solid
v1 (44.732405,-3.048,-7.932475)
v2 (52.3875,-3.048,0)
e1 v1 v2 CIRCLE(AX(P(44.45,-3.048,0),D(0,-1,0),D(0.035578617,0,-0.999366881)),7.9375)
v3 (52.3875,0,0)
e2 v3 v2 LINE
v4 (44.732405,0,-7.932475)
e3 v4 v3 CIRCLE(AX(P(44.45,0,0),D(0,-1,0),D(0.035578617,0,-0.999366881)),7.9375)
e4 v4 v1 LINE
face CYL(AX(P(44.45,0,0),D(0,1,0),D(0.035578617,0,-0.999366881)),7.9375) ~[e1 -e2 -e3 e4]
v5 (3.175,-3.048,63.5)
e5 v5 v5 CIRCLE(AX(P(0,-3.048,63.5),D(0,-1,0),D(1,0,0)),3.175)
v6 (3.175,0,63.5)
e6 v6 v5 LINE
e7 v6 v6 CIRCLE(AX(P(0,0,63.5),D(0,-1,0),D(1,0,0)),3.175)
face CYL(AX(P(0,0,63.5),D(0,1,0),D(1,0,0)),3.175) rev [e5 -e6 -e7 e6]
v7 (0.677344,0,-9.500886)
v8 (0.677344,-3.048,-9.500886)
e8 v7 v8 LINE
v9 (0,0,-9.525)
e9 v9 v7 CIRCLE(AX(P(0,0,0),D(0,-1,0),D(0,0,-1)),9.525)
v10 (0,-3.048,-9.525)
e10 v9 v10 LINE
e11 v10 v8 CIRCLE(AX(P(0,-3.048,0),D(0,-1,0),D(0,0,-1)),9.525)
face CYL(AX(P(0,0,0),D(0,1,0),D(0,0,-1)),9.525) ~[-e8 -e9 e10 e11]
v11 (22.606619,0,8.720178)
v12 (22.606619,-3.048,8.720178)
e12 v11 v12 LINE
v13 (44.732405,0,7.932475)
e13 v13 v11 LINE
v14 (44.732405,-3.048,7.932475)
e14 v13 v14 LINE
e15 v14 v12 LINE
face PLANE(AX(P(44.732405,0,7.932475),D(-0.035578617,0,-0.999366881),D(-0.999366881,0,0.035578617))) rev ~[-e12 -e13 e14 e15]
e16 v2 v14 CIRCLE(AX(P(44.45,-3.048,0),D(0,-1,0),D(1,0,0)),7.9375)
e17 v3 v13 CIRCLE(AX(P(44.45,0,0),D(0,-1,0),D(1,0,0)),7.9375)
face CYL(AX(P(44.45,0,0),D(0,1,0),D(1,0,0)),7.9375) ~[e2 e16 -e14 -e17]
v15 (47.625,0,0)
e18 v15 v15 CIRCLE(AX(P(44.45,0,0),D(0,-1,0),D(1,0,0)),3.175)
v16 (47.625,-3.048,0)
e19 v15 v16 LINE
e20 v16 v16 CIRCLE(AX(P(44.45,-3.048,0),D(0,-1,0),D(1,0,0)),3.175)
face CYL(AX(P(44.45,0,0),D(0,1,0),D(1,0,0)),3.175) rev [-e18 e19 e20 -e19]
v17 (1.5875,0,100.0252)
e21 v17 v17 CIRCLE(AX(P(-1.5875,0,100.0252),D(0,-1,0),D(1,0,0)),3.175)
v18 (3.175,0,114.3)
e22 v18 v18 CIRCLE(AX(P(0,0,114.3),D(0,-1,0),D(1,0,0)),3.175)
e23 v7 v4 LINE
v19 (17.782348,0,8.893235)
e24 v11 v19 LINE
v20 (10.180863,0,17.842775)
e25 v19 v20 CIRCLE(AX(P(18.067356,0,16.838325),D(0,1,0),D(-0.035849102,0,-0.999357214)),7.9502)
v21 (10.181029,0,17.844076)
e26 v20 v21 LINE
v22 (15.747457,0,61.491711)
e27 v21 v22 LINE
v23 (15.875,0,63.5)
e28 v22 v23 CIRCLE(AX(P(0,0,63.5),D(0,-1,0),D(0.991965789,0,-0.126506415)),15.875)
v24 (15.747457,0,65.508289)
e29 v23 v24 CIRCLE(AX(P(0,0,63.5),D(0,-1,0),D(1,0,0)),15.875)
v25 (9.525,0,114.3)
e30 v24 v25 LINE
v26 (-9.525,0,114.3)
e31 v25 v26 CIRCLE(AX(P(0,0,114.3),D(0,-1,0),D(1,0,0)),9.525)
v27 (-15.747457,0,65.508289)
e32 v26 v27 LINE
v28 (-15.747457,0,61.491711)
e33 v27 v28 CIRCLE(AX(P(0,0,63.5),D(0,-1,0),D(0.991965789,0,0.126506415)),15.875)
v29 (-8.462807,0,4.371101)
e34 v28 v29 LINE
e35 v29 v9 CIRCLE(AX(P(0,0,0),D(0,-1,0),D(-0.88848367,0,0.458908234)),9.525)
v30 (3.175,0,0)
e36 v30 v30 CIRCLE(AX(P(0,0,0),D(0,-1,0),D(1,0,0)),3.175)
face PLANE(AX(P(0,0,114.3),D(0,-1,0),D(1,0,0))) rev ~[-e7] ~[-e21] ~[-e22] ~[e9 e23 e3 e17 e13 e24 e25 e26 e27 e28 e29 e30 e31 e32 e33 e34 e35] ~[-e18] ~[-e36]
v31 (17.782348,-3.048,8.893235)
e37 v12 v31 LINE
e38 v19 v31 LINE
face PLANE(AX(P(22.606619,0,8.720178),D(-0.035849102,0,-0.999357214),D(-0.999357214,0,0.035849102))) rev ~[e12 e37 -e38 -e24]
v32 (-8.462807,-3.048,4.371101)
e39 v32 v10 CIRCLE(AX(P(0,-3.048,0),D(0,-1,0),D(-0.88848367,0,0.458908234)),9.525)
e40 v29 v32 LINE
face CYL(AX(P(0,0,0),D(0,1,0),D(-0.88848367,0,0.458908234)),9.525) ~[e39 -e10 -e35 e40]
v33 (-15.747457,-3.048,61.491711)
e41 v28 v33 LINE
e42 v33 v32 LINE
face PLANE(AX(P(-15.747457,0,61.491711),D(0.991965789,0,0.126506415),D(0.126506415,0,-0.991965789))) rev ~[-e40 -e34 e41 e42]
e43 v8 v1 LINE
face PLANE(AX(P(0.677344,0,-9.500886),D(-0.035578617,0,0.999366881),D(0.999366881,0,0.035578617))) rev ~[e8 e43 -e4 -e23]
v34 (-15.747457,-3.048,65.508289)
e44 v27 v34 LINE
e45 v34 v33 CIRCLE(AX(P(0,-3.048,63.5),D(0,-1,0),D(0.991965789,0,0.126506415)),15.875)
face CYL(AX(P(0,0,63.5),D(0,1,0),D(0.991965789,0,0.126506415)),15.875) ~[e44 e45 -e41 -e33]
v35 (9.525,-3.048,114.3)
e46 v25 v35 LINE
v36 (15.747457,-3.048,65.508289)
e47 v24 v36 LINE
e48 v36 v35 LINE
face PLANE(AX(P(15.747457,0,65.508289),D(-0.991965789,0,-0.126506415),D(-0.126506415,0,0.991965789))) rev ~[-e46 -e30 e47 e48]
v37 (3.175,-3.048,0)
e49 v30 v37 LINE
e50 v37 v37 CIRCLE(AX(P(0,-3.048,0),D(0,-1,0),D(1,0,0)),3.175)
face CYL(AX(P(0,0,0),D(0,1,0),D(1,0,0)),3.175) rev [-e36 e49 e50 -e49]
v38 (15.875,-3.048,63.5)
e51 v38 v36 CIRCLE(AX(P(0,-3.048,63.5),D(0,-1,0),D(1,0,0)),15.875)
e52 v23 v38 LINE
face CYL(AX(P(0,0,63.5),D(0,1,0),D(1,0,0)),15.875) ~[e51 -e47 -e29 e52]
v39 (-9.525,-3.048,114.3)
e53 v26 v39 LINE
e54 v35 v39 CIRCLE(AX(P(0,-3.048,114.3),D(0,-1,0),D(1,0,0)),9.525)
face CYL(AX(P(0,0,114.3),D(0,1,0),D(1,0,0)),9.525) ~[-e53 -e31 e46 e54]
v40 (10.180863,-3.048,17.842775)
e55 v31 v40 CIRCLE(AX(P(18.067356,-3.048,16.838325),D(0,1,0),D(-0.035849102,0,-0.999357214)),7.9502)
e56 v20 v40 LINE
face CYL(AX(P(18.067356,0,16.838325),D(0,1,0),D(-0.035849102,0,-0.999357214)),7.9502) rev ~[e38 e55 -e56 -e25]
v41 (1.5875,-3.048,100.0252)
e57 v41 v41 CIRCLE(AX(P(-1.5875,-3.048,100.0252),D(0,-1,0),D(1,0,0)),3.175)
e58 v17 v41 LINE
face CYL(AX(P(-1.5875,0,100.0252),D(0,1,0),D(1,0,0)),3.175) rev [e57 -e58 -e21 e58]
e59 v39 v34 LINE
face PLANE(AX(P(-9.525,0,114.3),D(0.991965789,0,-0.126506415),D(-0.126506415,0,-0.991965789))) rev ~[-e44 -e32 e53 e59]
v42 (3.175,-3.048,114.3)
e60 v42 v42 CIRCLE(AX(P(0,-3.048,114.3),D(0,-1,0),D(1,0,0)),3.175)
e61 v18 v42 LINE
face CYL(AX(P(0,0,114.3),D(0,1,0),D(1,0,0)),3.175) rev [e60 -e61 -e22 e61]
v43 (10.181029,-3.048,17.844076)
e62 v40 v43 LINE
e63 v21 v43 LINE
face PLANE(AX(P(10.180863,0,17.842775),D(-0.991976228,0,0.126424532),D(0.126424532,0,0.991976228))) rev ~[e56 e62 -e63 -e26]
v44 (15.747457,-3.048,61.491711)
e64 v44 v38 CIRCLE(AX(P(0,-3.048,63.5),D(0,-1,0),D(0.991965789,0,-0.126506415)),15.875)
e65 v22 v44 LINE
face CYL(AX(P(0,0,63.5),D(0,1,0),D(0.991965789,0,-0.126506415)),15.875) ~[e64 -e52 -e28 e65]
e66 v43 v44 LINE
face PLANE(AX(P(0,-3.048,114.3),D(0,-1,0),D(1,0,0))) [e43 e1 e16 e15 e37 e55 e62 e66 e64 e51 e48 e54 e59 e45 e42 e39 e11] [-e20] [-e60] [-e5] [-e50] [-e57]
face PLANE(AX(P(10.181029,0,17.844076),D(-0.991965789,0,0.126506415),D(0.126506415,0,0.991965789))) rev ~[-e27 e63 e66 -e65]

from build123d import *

# Parameters (mm, degrees)
F0_R     = 3.175
F1_DEPTH = 3.048


# Not quite as in the source:
# - ends of sketch curves that miss each other by under 0.0002 mm in the source are joined


with BuildPart() as f1:
    # F0 (on Front) → F1 (new body)
    with BuildSketch(Plane.XZ):
        with BuildLine():
            ThreePointArc((-9.525, 114.3), (0, 104.775), (9.525, 114.3))
            ThreePointArc((9.525, 114.3), (0, 123.825), (-9.525, 114.3))
        make_face()
        with Locations((0, 114.3)):
            Circle(F0_R, mode=Mode.SUBTRACT)
        with BuildLine():
            Line((15.7474569047, 65.5082893304), (9.525, 114.3))
            ThreePointArc((9.525, 114.3), (0, 104.775), (-9.525, 114.3))
            Line((-9.525, 114.3), (-15.7474569047, 65.5082893304))
            ThreePointArc((-15.7474569047, 65.5082893304), (0, 79.375), (15.7474569047, 65.5082893304))
        make_face()
        with Locations((-1.5875, 100.0252)):
            Circle(F0_R, mode=Mode.SUBTRACT)
        with BuildLine():
            ThreePointArc((15.875, 63.5), (15.8430821396, 64.5061676396), (15.7474569047, 65.5082893304))
            ThreePointArc((15.7474569047, 65.5082893304), (0, 79.375), (-15.7474569047, 65.5082893304))
            ThreePointArc((-15.7474569047, 65.5082893304), (-15.875, 63.5), (-15.7474569047, 61.4917106696))
            ThreePointArc((-15.7474569047, 61.4917106696), (0, 47.625), (15.7474569047, 61.4917106696))
            ThreePointArc((15.7474569047, 61.4917106696), (15.8430821396, 62.4938323604), (15.875, 63.5))
        make_face()
        with Locations((0, 63.5)):
            Circle(F0_R, mode=Mode.SUBTRACT)
        with BuildLine():
            ThreePointArc((15.7474569047, 61.4917106696), (0, 47.625), (-15.7474569047, 61.4917106696))
            Line((-15.7474569047, 61.4917106696), (-8.4628069595, 4.371100933))
            ThreePointArc((-8.4628069595, 4.371100933), (2.2491541422, 9.2556431783), (9.525, 0))
            ThreePointArc((9.525, 0), (6.9705567315, -6.4912990883), (0.6773435479, -9.500885786))
            Line((0.6773435479, -9.500885786), (44.7324052746, -7.9324746146))
            ThreePointArc((44.7324052746, -7.9324746146), (36.5125, 0), (44.7324052746, 7.9324746146))
            Line((44.7324052746, 7.9324746146), (22.606619146, 8.7201782014))
            Line((22.606619146, 8.7201782014), (17.7823482037, 8.8932352229))
            ThreePointArc((17.7823482037, 8.8932352229), (12.00790709, 11.6916015121), (10.1808634842, 17.8427750365))
            Line((10.1808634842, 17.8427750365), (10.1810293195, 17.844076245))
            Line((10.1810293195, 17.844076245), (15.7474569047, 61.4917106696))
        make_face()
        with BuildLine():
            ThreePointArc((9.525, 0), (2.2491541422, 9.2556431783), (-8.4628069595, 4.371100933))
            ThreePointArc((-8.4628069595, 4.371100933), (-8.1351202015, -4.9543359097), (0, -9.525))
            Line((0, -9.525), (0.6773435479, -9.500885786))
            ThreePointArc((0.6773435479, -9.500885786), (6.9705567315, -6.4912990883), (9.525, 0))
        make_face()
        Circle(F0_R, mode=Mode.SUBTRACT)
        with BuildLine():
            Line((0.6773435479, -9.500885786), (0, -9.525))
            ThreePointArc((0, -9.525), (0.3388863295, -9.5189695375), (0.6773435479, -9.500885786))
        make_face()
        with BuildLine():
            ThreePointArc((44.7324052746, 7.9324746146), (36.5125, 0), (44.7324052746, -7.9324746146))
            ThreePointArc((44.7324052746, -7.9324746146), (50.1616327839, -5.5119104847), (52.3875, 0))
            ThreePointArc((52.3875, 0), (50.1616327839, 5.5119104847), (44.7324052746, 7.9324746146))
        make_face()
        with Locations((44.45, 0)):
            Circle(F0_R, mode=Mode.SUBTRACT)
    extrude(amount=F1_DEPTH)


solid = f1.part
